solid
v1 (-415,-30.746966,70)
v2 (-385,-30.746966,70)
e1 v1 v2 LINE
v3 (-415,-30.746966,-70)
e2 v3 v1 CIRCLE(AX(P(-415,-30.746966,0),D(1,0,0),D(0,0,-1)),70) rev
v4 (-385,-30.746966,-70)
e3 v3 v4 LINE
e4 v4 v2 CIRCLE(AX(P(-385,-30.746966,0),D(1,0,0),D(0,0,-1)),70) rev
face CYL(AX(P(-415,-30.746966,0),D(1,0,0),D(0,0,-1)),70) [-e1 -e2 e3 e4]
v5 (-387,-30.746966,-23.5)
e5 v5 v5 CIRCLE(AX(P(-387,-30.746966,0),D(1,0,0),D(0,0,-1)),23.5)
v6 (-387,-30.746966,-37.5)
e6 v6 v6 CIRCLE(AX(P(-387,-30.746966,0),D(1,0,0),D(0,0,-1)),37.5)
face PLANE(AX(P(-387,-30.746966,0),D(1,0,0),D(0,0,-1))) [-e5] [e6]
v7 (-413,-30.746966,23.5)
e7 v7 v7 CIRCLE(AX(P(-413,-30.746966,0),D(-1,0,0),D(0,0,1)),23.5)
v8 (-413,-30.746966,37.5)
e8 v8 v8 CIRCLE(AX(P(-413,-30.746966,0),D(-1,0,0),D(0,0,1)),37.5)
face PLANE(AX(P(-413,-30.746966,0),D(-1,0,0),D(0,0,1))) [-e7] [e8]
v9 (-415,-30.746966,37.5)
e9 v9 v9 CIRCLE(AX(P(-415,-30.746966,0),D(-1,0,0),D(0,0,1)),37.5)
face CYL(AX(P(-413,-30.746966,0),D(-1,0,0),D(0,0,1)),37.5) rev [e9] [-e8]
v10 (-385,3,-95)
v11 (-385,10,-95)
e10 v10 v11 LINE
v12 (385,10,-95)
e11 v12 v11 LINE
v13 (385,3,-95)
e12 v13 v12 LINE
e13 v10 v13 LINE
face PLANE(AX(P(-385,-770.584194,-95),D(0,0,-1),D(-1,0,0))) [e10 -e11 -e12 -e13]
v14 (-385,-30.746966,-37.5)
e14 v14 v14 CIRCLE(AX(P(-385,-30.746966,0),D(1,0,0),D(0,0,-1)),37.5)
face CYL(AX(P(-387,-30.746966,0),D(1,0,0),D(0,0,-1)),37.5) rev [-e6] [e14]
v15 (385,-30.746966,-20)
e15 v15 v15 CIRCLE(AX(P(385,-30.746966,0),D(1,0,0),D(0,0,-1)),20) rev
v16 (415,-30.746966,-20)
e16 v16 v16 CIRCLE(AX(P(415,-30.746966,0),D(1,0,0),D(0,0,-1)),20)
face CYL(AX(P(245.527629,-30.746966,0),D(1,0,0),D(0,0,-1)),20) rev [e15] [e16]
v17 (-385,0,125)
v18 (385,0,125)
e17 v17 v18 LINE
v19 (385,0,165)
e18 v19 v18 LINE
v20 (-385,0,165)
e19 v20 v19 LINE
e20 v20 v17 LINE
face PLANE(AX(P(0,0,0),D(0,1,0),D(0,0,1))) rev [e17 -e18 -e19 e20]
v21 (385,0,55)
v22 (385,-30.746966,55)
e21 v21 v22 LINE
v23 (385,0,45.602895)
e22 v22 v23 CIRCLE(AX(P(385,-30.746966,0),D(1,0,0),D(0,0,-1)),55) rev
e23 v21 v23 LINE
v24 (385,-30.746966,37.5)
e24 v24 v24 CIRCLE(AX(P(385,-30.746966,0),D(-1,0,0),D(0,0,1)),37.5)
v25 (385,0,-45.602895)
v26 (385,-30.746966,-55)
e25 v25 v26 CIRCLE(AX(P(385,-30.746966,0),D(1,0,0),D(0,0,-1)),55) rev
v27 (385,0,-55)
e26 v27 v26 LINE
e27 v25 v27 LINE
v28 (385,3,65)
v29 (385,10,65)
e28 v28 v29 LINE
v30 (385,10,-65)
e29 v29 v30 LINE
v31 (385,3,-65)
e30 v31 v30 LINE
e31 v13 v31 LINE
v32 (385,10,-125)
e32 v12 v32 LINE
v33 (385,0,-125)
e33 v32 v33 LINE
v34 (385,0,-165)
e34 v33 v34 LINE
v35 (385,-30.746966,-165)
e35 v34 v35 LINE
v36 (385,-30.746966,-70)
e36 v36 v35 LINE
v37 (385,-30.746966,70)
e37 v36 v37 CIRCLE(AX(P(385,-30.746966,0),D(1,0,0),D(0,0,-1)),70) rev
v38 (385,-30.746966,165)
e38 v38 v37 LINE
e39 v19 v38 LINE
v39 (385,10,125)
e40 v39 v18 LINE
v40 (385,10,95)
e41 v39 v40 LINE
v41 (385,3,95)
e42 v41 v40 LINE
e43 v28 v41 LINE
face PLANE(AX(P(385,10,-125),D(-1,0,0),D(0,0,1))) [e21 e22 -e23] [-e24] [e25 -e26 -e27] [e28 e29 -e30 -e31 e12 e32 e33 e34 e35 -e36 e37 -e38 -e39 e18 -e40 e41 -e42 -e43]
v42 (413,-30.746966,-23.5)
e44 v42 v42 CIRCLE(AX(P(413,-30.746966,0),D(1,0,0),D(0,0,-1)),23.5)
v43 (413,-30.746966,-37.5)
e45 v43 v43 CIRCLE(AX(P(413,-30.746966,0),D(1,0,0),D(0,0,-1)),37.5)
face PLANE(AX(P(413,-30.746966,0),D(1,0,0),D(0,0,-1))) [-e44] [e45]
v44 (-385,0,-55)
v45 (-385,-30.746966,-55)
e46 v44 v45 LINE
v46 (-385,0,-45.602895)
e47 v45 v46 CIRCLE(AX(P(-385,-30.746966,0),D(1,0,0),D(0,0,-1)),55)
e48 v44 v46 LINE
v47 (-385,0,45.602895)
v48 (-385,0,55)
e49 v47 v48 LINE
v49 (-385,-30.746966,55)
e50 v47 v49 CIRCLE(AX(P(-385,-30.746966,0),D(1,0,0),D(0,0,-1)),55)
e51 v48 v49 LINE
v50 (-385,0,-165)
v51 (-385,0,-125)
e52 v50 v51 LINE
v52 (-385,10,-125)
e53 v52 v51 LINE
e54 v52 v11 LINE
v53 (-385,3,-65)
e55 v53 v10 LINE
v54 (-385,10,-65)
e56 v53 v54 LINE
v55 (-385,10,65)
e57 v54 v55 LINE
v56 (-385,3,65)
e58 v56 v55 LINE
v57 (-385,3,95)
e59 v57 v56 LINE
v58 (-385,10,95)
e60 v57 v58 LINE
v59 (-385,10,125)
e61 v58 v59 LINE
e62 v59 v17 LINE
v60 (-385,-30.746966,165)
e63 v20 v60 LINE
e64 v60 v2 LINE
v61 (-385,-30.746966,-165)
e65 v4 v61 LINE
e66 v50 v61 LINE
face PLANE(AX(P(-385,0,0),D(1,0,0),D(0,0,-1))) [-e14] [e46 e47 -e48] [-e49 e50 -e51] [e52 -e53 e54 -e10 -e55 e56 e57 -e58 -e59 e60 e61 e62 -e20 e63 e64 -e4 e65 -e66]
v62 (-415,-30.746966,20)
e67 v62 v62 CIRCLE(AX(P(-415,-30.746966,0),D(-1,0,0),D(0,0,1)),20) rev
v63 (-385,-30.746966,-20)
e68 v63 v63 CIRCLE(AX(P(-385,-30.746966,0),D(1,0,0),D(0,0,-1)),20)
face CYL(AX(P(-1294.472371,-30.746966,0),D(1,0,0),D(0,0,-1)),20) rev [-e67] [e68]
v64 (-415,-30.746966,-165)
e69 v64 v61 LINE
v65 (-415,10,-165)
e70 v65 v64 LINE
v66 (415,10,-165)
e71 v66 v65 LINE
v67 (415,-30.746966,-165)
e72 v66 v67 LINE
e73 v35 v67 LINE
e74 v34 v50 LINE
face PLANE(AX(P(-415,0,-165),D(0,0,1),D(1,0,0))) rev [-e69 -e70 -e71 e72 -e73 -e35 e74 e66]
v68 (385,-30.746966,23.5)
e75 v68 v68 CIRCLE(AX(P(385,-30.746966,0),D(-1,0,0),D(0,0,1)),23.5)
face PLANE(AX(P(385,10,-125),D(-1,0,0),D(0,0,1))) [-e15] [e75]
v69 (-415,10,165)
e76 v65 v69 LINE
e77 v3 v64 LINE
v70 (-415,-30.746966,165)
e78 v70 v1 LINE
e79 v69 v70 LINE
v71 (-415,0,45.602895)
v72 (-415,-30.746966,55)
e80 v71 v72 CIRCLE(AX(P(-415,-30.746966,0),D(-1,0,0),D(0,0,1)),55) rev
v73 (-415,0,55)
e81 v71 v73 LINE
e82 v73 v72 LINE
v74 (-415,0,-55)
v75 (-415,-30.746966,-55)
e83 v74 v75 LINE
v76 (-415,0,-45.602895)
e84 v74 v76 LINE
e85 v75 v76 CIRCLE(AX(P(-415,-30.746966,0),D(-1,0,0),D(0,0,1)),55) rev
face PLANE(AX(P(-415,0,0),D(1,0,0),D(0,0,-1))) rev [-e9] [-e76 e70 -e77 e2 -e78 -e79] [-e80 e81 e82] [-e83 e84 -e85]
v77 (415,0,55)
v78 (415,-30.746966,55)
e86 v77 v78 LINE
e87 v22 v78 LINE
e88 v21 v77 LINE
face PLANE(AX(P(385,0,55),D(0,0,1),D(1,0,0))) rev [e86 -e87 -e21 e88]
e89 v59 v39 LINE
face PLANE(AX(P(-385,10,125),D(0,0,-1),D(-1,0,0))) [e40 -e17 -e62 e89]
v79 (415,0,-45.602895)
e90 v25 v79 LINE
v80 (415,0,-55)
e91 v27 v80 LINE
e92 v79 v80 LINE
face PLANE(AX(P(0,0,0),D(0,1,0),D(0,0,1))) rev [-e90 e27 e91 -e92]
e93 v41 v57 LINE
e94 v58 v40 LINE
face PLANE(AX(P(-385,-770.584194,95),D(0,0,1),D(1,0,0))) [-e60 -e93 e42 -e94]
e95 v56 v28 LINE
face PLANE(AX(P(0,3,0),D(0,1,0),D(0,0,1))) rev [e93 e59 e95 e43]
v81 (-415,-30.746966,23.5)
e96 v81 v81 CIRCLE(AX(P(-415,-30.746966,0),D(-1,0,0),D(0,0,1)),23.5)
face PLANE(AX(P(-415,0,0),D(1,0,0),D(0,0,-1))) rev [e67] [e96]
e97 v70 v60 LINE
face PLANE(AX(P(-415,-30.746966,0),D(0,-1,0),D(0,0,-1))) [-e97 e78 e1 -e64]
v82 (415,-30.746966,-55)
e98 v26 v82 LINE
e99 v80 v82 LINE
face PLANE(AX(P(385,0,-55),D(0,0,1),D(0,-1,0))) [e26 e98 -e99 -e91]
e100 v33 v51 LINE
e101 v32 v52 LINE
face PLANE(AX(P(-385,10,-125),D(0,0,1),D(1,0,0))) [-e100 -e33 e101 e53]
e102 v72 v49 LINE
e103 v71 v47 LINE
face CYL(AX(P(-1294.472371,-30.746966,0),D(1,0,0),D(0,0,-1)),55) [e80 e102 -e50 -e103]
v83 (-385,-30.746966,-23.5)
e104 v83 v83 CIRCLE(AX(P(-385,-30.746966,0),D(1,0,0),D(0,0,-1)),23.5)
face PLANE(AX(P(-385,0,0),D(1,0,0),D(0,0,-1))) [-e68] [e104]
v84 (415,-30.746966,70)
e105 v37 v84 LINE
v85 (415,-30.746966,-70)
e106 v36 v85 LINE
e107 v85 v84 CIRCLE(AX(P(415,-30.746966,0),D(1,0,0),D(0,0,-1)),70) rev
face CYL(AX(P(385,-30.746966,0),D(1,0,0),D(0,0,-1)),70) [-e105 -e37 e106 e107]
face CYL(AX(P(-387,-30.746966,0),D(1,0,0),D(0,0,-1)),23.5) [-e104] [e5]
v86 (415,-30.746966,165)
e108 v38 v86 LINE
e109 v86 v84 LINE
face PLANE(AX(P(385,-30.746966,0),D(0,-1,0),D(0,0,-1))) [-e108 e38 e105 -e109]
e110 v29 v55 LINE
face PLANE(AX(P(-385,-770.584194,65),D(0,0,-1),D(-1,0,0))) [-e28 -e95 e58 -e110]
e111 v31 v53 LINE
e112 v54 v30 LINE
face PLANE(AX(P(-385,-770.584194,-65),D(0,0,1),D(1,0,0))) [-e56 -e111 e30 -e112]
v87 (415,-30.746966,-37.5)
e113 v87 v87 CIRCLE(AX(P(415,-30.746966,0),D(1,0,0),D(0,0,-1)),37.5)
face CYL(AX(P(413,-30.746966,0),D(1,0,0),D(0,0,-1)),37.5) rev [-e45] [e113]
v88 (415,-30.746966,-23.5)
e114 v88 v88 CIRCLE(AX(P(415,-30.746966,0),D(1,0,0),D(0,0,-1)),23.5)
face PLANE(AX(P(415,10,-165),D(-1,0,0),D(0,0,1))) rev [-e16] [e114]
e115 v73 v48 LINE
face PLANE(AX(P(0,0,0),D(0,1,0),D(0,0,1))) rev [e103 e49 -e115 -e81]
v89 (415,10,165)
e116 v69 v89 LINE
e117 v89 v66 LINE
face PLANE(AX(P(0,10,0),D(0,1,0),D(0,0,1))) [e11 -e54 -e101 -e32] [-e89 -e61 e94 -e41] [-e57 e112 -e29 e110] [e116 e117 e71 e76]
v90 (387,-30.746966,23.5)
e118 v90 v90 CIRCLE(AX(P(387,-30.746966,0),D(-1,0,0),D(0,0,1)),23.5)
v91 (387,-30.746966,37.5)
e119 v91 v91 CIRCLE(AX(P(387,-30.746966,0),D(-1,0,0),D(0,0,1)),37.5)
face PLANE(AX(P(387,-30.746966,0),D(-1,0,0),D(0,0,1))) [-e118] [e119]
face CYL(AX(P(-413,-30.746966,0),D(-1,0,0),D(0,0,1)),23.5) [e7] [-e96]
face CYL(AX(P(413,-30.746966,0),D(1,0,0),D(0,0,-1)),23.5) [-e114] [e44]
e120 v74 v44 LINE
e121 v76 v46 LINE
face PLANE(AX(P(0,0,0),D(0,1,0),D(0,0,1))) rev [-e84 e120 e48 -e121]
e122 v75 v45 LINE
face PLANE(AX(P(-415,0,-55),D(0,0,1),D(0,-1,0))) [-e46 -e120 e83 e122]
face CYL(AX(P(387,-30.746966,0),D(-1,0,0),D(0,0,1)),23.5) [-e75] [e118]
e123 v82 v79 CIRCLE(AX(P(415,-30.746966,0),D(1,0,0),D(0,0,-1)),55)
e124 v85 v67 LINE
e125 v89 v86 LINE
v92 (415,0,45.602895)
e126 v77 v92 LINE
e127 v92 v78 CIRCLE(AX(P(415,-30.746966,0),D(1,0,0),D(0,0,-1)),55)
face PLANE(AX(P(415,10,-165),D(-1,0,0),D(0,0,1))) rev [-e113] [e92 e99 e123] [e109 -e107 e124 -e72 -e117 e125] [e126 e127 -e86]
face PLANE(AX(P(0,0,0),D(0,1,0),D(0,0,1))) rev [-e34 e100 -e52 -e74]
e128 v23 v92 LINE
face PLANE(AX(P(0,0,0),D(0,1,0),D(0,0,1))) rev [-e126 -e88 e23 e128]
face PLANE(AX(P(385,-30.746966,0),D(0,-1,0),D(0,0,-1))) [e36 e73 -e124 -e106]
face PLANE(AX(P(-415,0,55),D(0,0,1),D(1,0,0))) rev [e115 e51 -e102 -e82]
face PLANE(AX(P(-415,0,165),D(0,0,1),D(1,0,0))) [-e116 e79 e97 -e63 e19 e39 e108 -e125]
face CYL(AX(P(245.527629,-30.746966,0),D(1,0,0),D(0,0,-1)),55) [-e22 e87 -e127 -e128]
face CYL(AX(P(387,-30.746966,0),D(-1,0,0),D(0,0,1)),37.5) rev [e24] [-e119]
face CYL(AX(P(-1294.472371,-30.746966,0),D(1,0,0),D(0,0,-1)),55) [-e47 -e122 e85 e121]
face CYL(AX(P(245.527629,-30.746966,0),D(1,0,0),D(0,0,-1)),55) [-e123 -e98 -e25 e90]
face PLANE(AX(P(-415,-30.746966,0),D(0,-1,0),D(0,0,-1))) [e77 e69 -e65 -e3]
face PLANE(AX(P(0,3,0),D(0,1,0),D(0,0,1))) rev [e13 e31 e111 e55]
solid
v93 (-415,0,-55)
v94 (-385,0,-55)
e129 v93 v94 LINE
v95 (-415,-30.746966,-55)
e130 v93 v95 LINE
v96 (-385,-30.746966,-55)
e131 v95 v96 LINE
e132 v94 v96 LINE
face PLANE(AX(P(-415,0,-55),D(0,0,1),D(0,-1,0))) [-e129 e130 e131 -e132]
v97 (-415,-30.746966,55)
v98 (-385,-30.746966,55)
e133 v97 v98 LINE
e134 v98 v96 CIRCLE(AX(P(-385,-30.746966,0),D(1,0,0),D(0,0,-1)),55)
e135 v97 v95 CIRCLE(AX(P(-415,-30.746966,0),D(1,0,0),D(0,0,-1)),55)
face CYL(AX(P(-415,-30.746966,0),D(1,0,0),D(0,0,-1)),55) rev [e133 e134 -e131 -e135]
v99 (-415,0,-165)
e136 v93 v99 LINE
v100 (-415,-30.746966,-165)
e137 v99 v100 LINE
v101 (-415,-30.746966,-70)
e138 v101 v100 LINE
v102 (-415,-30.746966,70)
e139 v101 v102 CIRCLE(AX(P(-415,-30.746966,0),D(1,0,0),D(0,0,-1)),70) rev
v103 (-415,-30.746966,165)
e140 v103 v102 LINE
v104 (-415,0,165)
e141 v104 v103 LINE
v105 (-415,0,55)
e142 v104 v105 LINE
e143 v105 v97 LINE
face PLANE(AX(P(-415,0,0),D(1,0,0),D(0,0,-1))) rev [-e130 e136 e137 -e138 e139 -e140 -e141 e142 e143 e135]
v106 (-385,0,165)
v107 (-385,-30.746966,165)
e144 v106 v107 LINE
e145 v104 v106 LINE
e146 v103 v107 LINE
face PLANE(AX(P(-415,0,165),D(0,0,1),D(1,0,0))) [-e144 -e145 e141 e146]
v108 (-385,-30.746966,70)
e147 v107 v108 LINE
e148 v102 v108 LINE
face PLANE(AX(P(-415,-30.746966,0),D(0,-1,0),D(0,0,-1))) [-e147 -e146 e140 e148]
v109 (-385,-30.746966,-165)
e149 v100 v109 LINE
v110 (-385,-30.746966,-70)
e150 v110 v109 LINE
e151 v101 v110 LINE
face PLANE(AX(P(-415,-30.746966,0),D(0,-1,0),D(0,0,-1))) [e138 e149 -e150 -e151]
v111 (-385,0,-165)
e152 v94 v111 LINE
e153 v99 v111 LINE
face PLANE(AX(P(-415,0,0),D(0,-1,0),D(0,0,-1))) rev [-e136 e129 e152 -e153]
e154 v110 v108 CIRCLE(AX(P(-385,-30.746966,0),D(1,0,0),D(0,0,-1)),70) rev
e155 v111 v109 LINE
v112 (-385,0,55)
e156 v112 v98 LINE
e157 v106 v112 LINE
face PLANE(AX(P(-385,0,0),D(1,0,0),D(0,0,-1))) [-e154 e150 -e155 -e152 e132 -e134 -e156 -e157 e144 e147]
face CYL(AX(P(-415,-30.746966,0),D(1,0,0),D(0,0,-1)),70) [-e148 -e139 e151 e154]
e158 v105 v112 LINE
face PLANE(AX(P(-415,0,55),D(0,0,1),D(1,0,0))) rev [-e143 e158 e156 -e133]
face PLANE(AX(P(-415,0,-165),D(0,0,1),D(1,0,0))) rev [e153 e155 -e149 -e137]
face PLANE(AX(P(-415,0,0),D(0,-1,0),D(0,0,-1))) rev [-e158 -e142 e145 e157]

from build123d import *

# Parameters (mm, degrees)
SKETCH3_W               = 830
SKETCH3_H               = 330
SKETCH3_W_2             = 770
SKETCH3_H_2             = 250
BOSS_EXTRUDE1_DEPTH     = 10
SKETCH4_W               = 770
SKETCH4_H               = 30
BOSS_EXTRUDE2_DEPTH     = 7
BOSS_EXTRUDE4_DEPTH     = 30
LPATTERN1_COUNT         = 2
LPATTERN1_PITCH         = 800
SKETCH7_R               = 20
BOSS_EXTRUDE5_DEPTH     = 30
SKETCH9_R               = 37.5
SKETCH9_R_2             = 23.5
CUT_EXTRUDE1_DEPTH      = 2
CUT_EXTRUDE2_START      = -2
SKETCH10_R              = 37.5
SKETCH10_R_2            = 23.5
CUT_EXTRUDE2_DEPTH      = 2
LPATTERN3_START         = -415
LPATTERN3_DEPTH         = 2
LPATTERN3_START_2       = -387
LPATTERN3_2_DEPTH       = 2
LPATTERN3_START_3       = -413
LPATTERN3_3_OUTLINE_R   = 20
LPATTERN3_3_DEPTH       = 26
LPATTERN3_4_OUTLINE_R   = 23.5
LPATTERN3_4_OUTLINE_R_2 = 20
LPATTERN3_4_DEPTH       = 30


# Read off the part's stored shape, not the designer's step: LPattern3
with BuildPart() as part:
    # Sketch3 → Boss-Extrude1 (new body)
    with BuildSketch(Plane(origin=(0, 0, 0), x_dir=(1, 0, 0), z_dir=(0, 1, 0))):
        Rectangle(SKETCH3_W, SKETCH3_H)
        Rectangle(SKETCH3_W_2, SKETCH3_H_2, mode=Mode.SUBTRACT)
    extrude(amount=BOSS_EXTRUDE1_DEPTH)

    # Sketch4 → Boss-Extrude2 (add)
    with BuildSketch(Plane(origin=(0, 10, 0), x_dir=(1, 0, 0), z_dir=(0, 1, 0))):
        with Locations((0, 80)):
            Rectangle(SKETCH4_W, SKETCH4_H)
        with Locations((0, -80)):
            Rectangle(SKETCH4_W, SKETCH4_H)
    extrude(amount=-BOSS_EXTRUDE2_DEPTH)



with BuildPart() as body_2:
    # Sketch5 → Boss-Extrude4 (new body)
    with BuildSketch(Plane(origin=(415, 0, 0), x_dir=(0, 0, -1), z_dir=(1, 0, 0))):
        with BuildLine():
            ThreePointArc((55, -30.746966092), (0, -85.746966092), (-55, -30.746966092))
            Line((-55, -30.746966092), (-70, -30.746966092))
            ThreePointArc((-70, -30.746966092), (0, -100.746966092), (70, -30.746966092))
            Line((70, -30.746966092), (55, -30.746966092))
        make_face()
        Polygon((-55, 0), (-165, 0), (-165, -30.746966092), (-70, -30.746966092), (-55, -30.746966092), align=None)
        Polygon((165, 0), (55, 0), (55, -30.746966092), (70, -30.746966092), (165, -30.746966092), align=None)
    boss_extrude4 = extrude(amount=-BOSS_EXTRUDE4_DEPTH)


with BuildPart() as lpattern1_1:
    # LPattern1: Boss-Extrude4 ×2
    with Locations(*[(-i * LPATTERN1_PITCH, 0, 0) for i in range(1, LPATTERN1_COUNT)]):
        add(boss_extrude4)


with BuildPart() as part_1:
    add(part.part)

    add(body_2.part)  # Boss-Extrude5 merges body 2
    # Sketch7 → Boss-Extrude5 (add)
    with BuildSketch(Plane(origin=(415, 0, 0), x_dir=(0, 0, -1), z_dir=(1, 0, 0))):
        with BuildLine():
            Line((45.60289548, 0), (-45.60289548, 0))
            ThreePointArc((-45.60289548, 0), (0, -85.746966092), (45.60289548, 0))
        make_face()
        with Locations((0, -30.746966092)):
            Circle(SKETCH7_R, mode=Mode.SUBTRACT)
    extrude(amount=-BOSS_EXTRUDE5_DEPTH)

    # Sketch9 → Cut-Extrude1 (cut)
    with BuildSketch(Plane(origin=(415, 0, 0), x_dir=(0, 0, -1), z_dir=(1, 0, 0))):
        with Locations((0, -30.746966092)):
            Circle(SKETCH9_R)
        with Locations((0, -30.746966092)):
            Circle(SKETCH9_R_2, mode=Mode.SUBTRACT)
    extrude(amount=-CUT_EXTRUDE1_DEPTH, mode=Mode.SUBTRACT)

    # Sketch10 → Cut-Extrude2 (cut)
    with BuildSketch(Plane.ZY.offset(-385).offset(CUT_EXTRUDE2_START)):
        with Locations(Location((0, -30.746966092, 0), (0, 0, 180))):
            Circle(SKETCH10_R)
        with Locations(Location((0, -30.746966092, 0), (0, 0, 180))):
            Circle(SKETCH10_R_2, mode=Mode.SUBTRACT)
    extrude(amount=CUT_EXTRUDE2_DEPTH, mode=Mode.SUBTRACT)

    # LPattern3 outline → LPattern3 (cut)
    with BuildSketch(Plane.YZ.offset(LPATTERN3_START)):
        with BuildLine():
            ThreePointArc((0, -21.467977924), (6.753033908, 0), (0, 21.467977924))
            Line((0, 21.467977924), (0, -21.467977924))
        make_face()
    extrude(amount=LPATTERN3_DEPTH, mode=Mode.SUBTRACT)

    # LPattern3 2 outline → LPattern3 2 (cut)
    with BuildSketch(Plane.YZ.offset(LPATTERN3_START_2)):
        with BuildLine():
            ThreePointArc((0, -21.467977924), (6.753033908, 0), (0, 21.467977924))
            Line((0, 21.467977924), (0, -21.467977924))
        make_face()
    extrude(amount=LPATTERN3_2_DEPTH, mode=Mode.SUBTRACT)

    # LPattern3 3 outline → LPattern3 3 (add)
    with BuildSketch(Plane.YZ.offset(LPATTERN3_START_3)):
        with BuildLine():
            Line((-30.746966092, 165), (-30.746966092, 70))
            ThreePointArc((-30.746966092, 70), (-100.746966092, 0), (-30.746966092, -70))
            Line((-30.746966092, -70), (-30.746966092, -165))
            Line((-30.746966092, -165), (0, -165))
            Line((0, -165), (0, -55))
            Line((0, -55), (-30.746966092, -55))
            ThreePointArc((-30.746966092, -55), (-14.671507333, -52.598285387), (0, -45.60289548))
            Line((0, -45.60289548), (0, 45.60289548))
            ThreePointArc((0, 45.60289548), (-14.671507333, 52.598285387), (-30.746966092, 55))
            Line((-30.746966092, 55), (0, 55))
            Line((0, 55), (0, 165))
            Line((0, 165), (-30.746966092, 165))
        make_face()
        with Locations((-30.746966092, 0)):
            Circle(LPATTERN3_3_OUTLINE_R, mode=Mode.SUBTRACT)
    extrude(amount=LPATTERN3_3_DEPTH)

    # LPattern3 4 outline → LPattern3 4 (add)
    # profile 1 of 2: a face of its own
    with BuildSketch(Plane.YZ.offset(LPATTERN3_START)):
        with BuildLine():
            Line((-30.746966092, 165), (-30.746966092, 70))
            ThreePointArc((-30.746966092, 70), (-100.746966092, 0), (-30.746966092, -70))
            Line((-30.746966092, -70), (-30.746966092, -165))
            Line((-30.746966092, -165), (0, -165))
            Line((0, -165), (0, -55))
            Line((0, -55), (-30.746966092, -55))
            ThreePointArc((-30.746966092, -55), (-14.671507333, -52.598285387), (0, -45.60289548))
            Line((0, -45.60289548), (0, -21.467977924))
            ThreePointArc((0, -21.467977924), (-68.246966092, 0), (0, 21.467977924))
            Line((0, 21.467977924), (0, 45.60289548))
            ThreePointArc((0, 45.60289548), (-14.671507333, 52.598285387), (-30.746966092, 55))
            Line((-30.746966092, 55), (0, 55))
            Line((0, 55), (0, 165))
            Line((0, 165), (-30.746966092, 165))
        make_face()
    # profile 2 of 2: a face of its own
    with BuildSketch(Plane.YZ.offset(LPATTERN3_START)):
        with Locations((-30.746966092, 0)):
            Circle(LPATTERN3_4_OUTLINE_R)
        with Locations((-30.746966092, 0)):
            Circle(LPATTERN3_4_OUTLINE_R_2, mode=Mode.SUBTRACT)
    extrude(amount=LPATTERN3_4_DEPTH)


solid = Compound([lpattern1_1.part, part_1.part])
